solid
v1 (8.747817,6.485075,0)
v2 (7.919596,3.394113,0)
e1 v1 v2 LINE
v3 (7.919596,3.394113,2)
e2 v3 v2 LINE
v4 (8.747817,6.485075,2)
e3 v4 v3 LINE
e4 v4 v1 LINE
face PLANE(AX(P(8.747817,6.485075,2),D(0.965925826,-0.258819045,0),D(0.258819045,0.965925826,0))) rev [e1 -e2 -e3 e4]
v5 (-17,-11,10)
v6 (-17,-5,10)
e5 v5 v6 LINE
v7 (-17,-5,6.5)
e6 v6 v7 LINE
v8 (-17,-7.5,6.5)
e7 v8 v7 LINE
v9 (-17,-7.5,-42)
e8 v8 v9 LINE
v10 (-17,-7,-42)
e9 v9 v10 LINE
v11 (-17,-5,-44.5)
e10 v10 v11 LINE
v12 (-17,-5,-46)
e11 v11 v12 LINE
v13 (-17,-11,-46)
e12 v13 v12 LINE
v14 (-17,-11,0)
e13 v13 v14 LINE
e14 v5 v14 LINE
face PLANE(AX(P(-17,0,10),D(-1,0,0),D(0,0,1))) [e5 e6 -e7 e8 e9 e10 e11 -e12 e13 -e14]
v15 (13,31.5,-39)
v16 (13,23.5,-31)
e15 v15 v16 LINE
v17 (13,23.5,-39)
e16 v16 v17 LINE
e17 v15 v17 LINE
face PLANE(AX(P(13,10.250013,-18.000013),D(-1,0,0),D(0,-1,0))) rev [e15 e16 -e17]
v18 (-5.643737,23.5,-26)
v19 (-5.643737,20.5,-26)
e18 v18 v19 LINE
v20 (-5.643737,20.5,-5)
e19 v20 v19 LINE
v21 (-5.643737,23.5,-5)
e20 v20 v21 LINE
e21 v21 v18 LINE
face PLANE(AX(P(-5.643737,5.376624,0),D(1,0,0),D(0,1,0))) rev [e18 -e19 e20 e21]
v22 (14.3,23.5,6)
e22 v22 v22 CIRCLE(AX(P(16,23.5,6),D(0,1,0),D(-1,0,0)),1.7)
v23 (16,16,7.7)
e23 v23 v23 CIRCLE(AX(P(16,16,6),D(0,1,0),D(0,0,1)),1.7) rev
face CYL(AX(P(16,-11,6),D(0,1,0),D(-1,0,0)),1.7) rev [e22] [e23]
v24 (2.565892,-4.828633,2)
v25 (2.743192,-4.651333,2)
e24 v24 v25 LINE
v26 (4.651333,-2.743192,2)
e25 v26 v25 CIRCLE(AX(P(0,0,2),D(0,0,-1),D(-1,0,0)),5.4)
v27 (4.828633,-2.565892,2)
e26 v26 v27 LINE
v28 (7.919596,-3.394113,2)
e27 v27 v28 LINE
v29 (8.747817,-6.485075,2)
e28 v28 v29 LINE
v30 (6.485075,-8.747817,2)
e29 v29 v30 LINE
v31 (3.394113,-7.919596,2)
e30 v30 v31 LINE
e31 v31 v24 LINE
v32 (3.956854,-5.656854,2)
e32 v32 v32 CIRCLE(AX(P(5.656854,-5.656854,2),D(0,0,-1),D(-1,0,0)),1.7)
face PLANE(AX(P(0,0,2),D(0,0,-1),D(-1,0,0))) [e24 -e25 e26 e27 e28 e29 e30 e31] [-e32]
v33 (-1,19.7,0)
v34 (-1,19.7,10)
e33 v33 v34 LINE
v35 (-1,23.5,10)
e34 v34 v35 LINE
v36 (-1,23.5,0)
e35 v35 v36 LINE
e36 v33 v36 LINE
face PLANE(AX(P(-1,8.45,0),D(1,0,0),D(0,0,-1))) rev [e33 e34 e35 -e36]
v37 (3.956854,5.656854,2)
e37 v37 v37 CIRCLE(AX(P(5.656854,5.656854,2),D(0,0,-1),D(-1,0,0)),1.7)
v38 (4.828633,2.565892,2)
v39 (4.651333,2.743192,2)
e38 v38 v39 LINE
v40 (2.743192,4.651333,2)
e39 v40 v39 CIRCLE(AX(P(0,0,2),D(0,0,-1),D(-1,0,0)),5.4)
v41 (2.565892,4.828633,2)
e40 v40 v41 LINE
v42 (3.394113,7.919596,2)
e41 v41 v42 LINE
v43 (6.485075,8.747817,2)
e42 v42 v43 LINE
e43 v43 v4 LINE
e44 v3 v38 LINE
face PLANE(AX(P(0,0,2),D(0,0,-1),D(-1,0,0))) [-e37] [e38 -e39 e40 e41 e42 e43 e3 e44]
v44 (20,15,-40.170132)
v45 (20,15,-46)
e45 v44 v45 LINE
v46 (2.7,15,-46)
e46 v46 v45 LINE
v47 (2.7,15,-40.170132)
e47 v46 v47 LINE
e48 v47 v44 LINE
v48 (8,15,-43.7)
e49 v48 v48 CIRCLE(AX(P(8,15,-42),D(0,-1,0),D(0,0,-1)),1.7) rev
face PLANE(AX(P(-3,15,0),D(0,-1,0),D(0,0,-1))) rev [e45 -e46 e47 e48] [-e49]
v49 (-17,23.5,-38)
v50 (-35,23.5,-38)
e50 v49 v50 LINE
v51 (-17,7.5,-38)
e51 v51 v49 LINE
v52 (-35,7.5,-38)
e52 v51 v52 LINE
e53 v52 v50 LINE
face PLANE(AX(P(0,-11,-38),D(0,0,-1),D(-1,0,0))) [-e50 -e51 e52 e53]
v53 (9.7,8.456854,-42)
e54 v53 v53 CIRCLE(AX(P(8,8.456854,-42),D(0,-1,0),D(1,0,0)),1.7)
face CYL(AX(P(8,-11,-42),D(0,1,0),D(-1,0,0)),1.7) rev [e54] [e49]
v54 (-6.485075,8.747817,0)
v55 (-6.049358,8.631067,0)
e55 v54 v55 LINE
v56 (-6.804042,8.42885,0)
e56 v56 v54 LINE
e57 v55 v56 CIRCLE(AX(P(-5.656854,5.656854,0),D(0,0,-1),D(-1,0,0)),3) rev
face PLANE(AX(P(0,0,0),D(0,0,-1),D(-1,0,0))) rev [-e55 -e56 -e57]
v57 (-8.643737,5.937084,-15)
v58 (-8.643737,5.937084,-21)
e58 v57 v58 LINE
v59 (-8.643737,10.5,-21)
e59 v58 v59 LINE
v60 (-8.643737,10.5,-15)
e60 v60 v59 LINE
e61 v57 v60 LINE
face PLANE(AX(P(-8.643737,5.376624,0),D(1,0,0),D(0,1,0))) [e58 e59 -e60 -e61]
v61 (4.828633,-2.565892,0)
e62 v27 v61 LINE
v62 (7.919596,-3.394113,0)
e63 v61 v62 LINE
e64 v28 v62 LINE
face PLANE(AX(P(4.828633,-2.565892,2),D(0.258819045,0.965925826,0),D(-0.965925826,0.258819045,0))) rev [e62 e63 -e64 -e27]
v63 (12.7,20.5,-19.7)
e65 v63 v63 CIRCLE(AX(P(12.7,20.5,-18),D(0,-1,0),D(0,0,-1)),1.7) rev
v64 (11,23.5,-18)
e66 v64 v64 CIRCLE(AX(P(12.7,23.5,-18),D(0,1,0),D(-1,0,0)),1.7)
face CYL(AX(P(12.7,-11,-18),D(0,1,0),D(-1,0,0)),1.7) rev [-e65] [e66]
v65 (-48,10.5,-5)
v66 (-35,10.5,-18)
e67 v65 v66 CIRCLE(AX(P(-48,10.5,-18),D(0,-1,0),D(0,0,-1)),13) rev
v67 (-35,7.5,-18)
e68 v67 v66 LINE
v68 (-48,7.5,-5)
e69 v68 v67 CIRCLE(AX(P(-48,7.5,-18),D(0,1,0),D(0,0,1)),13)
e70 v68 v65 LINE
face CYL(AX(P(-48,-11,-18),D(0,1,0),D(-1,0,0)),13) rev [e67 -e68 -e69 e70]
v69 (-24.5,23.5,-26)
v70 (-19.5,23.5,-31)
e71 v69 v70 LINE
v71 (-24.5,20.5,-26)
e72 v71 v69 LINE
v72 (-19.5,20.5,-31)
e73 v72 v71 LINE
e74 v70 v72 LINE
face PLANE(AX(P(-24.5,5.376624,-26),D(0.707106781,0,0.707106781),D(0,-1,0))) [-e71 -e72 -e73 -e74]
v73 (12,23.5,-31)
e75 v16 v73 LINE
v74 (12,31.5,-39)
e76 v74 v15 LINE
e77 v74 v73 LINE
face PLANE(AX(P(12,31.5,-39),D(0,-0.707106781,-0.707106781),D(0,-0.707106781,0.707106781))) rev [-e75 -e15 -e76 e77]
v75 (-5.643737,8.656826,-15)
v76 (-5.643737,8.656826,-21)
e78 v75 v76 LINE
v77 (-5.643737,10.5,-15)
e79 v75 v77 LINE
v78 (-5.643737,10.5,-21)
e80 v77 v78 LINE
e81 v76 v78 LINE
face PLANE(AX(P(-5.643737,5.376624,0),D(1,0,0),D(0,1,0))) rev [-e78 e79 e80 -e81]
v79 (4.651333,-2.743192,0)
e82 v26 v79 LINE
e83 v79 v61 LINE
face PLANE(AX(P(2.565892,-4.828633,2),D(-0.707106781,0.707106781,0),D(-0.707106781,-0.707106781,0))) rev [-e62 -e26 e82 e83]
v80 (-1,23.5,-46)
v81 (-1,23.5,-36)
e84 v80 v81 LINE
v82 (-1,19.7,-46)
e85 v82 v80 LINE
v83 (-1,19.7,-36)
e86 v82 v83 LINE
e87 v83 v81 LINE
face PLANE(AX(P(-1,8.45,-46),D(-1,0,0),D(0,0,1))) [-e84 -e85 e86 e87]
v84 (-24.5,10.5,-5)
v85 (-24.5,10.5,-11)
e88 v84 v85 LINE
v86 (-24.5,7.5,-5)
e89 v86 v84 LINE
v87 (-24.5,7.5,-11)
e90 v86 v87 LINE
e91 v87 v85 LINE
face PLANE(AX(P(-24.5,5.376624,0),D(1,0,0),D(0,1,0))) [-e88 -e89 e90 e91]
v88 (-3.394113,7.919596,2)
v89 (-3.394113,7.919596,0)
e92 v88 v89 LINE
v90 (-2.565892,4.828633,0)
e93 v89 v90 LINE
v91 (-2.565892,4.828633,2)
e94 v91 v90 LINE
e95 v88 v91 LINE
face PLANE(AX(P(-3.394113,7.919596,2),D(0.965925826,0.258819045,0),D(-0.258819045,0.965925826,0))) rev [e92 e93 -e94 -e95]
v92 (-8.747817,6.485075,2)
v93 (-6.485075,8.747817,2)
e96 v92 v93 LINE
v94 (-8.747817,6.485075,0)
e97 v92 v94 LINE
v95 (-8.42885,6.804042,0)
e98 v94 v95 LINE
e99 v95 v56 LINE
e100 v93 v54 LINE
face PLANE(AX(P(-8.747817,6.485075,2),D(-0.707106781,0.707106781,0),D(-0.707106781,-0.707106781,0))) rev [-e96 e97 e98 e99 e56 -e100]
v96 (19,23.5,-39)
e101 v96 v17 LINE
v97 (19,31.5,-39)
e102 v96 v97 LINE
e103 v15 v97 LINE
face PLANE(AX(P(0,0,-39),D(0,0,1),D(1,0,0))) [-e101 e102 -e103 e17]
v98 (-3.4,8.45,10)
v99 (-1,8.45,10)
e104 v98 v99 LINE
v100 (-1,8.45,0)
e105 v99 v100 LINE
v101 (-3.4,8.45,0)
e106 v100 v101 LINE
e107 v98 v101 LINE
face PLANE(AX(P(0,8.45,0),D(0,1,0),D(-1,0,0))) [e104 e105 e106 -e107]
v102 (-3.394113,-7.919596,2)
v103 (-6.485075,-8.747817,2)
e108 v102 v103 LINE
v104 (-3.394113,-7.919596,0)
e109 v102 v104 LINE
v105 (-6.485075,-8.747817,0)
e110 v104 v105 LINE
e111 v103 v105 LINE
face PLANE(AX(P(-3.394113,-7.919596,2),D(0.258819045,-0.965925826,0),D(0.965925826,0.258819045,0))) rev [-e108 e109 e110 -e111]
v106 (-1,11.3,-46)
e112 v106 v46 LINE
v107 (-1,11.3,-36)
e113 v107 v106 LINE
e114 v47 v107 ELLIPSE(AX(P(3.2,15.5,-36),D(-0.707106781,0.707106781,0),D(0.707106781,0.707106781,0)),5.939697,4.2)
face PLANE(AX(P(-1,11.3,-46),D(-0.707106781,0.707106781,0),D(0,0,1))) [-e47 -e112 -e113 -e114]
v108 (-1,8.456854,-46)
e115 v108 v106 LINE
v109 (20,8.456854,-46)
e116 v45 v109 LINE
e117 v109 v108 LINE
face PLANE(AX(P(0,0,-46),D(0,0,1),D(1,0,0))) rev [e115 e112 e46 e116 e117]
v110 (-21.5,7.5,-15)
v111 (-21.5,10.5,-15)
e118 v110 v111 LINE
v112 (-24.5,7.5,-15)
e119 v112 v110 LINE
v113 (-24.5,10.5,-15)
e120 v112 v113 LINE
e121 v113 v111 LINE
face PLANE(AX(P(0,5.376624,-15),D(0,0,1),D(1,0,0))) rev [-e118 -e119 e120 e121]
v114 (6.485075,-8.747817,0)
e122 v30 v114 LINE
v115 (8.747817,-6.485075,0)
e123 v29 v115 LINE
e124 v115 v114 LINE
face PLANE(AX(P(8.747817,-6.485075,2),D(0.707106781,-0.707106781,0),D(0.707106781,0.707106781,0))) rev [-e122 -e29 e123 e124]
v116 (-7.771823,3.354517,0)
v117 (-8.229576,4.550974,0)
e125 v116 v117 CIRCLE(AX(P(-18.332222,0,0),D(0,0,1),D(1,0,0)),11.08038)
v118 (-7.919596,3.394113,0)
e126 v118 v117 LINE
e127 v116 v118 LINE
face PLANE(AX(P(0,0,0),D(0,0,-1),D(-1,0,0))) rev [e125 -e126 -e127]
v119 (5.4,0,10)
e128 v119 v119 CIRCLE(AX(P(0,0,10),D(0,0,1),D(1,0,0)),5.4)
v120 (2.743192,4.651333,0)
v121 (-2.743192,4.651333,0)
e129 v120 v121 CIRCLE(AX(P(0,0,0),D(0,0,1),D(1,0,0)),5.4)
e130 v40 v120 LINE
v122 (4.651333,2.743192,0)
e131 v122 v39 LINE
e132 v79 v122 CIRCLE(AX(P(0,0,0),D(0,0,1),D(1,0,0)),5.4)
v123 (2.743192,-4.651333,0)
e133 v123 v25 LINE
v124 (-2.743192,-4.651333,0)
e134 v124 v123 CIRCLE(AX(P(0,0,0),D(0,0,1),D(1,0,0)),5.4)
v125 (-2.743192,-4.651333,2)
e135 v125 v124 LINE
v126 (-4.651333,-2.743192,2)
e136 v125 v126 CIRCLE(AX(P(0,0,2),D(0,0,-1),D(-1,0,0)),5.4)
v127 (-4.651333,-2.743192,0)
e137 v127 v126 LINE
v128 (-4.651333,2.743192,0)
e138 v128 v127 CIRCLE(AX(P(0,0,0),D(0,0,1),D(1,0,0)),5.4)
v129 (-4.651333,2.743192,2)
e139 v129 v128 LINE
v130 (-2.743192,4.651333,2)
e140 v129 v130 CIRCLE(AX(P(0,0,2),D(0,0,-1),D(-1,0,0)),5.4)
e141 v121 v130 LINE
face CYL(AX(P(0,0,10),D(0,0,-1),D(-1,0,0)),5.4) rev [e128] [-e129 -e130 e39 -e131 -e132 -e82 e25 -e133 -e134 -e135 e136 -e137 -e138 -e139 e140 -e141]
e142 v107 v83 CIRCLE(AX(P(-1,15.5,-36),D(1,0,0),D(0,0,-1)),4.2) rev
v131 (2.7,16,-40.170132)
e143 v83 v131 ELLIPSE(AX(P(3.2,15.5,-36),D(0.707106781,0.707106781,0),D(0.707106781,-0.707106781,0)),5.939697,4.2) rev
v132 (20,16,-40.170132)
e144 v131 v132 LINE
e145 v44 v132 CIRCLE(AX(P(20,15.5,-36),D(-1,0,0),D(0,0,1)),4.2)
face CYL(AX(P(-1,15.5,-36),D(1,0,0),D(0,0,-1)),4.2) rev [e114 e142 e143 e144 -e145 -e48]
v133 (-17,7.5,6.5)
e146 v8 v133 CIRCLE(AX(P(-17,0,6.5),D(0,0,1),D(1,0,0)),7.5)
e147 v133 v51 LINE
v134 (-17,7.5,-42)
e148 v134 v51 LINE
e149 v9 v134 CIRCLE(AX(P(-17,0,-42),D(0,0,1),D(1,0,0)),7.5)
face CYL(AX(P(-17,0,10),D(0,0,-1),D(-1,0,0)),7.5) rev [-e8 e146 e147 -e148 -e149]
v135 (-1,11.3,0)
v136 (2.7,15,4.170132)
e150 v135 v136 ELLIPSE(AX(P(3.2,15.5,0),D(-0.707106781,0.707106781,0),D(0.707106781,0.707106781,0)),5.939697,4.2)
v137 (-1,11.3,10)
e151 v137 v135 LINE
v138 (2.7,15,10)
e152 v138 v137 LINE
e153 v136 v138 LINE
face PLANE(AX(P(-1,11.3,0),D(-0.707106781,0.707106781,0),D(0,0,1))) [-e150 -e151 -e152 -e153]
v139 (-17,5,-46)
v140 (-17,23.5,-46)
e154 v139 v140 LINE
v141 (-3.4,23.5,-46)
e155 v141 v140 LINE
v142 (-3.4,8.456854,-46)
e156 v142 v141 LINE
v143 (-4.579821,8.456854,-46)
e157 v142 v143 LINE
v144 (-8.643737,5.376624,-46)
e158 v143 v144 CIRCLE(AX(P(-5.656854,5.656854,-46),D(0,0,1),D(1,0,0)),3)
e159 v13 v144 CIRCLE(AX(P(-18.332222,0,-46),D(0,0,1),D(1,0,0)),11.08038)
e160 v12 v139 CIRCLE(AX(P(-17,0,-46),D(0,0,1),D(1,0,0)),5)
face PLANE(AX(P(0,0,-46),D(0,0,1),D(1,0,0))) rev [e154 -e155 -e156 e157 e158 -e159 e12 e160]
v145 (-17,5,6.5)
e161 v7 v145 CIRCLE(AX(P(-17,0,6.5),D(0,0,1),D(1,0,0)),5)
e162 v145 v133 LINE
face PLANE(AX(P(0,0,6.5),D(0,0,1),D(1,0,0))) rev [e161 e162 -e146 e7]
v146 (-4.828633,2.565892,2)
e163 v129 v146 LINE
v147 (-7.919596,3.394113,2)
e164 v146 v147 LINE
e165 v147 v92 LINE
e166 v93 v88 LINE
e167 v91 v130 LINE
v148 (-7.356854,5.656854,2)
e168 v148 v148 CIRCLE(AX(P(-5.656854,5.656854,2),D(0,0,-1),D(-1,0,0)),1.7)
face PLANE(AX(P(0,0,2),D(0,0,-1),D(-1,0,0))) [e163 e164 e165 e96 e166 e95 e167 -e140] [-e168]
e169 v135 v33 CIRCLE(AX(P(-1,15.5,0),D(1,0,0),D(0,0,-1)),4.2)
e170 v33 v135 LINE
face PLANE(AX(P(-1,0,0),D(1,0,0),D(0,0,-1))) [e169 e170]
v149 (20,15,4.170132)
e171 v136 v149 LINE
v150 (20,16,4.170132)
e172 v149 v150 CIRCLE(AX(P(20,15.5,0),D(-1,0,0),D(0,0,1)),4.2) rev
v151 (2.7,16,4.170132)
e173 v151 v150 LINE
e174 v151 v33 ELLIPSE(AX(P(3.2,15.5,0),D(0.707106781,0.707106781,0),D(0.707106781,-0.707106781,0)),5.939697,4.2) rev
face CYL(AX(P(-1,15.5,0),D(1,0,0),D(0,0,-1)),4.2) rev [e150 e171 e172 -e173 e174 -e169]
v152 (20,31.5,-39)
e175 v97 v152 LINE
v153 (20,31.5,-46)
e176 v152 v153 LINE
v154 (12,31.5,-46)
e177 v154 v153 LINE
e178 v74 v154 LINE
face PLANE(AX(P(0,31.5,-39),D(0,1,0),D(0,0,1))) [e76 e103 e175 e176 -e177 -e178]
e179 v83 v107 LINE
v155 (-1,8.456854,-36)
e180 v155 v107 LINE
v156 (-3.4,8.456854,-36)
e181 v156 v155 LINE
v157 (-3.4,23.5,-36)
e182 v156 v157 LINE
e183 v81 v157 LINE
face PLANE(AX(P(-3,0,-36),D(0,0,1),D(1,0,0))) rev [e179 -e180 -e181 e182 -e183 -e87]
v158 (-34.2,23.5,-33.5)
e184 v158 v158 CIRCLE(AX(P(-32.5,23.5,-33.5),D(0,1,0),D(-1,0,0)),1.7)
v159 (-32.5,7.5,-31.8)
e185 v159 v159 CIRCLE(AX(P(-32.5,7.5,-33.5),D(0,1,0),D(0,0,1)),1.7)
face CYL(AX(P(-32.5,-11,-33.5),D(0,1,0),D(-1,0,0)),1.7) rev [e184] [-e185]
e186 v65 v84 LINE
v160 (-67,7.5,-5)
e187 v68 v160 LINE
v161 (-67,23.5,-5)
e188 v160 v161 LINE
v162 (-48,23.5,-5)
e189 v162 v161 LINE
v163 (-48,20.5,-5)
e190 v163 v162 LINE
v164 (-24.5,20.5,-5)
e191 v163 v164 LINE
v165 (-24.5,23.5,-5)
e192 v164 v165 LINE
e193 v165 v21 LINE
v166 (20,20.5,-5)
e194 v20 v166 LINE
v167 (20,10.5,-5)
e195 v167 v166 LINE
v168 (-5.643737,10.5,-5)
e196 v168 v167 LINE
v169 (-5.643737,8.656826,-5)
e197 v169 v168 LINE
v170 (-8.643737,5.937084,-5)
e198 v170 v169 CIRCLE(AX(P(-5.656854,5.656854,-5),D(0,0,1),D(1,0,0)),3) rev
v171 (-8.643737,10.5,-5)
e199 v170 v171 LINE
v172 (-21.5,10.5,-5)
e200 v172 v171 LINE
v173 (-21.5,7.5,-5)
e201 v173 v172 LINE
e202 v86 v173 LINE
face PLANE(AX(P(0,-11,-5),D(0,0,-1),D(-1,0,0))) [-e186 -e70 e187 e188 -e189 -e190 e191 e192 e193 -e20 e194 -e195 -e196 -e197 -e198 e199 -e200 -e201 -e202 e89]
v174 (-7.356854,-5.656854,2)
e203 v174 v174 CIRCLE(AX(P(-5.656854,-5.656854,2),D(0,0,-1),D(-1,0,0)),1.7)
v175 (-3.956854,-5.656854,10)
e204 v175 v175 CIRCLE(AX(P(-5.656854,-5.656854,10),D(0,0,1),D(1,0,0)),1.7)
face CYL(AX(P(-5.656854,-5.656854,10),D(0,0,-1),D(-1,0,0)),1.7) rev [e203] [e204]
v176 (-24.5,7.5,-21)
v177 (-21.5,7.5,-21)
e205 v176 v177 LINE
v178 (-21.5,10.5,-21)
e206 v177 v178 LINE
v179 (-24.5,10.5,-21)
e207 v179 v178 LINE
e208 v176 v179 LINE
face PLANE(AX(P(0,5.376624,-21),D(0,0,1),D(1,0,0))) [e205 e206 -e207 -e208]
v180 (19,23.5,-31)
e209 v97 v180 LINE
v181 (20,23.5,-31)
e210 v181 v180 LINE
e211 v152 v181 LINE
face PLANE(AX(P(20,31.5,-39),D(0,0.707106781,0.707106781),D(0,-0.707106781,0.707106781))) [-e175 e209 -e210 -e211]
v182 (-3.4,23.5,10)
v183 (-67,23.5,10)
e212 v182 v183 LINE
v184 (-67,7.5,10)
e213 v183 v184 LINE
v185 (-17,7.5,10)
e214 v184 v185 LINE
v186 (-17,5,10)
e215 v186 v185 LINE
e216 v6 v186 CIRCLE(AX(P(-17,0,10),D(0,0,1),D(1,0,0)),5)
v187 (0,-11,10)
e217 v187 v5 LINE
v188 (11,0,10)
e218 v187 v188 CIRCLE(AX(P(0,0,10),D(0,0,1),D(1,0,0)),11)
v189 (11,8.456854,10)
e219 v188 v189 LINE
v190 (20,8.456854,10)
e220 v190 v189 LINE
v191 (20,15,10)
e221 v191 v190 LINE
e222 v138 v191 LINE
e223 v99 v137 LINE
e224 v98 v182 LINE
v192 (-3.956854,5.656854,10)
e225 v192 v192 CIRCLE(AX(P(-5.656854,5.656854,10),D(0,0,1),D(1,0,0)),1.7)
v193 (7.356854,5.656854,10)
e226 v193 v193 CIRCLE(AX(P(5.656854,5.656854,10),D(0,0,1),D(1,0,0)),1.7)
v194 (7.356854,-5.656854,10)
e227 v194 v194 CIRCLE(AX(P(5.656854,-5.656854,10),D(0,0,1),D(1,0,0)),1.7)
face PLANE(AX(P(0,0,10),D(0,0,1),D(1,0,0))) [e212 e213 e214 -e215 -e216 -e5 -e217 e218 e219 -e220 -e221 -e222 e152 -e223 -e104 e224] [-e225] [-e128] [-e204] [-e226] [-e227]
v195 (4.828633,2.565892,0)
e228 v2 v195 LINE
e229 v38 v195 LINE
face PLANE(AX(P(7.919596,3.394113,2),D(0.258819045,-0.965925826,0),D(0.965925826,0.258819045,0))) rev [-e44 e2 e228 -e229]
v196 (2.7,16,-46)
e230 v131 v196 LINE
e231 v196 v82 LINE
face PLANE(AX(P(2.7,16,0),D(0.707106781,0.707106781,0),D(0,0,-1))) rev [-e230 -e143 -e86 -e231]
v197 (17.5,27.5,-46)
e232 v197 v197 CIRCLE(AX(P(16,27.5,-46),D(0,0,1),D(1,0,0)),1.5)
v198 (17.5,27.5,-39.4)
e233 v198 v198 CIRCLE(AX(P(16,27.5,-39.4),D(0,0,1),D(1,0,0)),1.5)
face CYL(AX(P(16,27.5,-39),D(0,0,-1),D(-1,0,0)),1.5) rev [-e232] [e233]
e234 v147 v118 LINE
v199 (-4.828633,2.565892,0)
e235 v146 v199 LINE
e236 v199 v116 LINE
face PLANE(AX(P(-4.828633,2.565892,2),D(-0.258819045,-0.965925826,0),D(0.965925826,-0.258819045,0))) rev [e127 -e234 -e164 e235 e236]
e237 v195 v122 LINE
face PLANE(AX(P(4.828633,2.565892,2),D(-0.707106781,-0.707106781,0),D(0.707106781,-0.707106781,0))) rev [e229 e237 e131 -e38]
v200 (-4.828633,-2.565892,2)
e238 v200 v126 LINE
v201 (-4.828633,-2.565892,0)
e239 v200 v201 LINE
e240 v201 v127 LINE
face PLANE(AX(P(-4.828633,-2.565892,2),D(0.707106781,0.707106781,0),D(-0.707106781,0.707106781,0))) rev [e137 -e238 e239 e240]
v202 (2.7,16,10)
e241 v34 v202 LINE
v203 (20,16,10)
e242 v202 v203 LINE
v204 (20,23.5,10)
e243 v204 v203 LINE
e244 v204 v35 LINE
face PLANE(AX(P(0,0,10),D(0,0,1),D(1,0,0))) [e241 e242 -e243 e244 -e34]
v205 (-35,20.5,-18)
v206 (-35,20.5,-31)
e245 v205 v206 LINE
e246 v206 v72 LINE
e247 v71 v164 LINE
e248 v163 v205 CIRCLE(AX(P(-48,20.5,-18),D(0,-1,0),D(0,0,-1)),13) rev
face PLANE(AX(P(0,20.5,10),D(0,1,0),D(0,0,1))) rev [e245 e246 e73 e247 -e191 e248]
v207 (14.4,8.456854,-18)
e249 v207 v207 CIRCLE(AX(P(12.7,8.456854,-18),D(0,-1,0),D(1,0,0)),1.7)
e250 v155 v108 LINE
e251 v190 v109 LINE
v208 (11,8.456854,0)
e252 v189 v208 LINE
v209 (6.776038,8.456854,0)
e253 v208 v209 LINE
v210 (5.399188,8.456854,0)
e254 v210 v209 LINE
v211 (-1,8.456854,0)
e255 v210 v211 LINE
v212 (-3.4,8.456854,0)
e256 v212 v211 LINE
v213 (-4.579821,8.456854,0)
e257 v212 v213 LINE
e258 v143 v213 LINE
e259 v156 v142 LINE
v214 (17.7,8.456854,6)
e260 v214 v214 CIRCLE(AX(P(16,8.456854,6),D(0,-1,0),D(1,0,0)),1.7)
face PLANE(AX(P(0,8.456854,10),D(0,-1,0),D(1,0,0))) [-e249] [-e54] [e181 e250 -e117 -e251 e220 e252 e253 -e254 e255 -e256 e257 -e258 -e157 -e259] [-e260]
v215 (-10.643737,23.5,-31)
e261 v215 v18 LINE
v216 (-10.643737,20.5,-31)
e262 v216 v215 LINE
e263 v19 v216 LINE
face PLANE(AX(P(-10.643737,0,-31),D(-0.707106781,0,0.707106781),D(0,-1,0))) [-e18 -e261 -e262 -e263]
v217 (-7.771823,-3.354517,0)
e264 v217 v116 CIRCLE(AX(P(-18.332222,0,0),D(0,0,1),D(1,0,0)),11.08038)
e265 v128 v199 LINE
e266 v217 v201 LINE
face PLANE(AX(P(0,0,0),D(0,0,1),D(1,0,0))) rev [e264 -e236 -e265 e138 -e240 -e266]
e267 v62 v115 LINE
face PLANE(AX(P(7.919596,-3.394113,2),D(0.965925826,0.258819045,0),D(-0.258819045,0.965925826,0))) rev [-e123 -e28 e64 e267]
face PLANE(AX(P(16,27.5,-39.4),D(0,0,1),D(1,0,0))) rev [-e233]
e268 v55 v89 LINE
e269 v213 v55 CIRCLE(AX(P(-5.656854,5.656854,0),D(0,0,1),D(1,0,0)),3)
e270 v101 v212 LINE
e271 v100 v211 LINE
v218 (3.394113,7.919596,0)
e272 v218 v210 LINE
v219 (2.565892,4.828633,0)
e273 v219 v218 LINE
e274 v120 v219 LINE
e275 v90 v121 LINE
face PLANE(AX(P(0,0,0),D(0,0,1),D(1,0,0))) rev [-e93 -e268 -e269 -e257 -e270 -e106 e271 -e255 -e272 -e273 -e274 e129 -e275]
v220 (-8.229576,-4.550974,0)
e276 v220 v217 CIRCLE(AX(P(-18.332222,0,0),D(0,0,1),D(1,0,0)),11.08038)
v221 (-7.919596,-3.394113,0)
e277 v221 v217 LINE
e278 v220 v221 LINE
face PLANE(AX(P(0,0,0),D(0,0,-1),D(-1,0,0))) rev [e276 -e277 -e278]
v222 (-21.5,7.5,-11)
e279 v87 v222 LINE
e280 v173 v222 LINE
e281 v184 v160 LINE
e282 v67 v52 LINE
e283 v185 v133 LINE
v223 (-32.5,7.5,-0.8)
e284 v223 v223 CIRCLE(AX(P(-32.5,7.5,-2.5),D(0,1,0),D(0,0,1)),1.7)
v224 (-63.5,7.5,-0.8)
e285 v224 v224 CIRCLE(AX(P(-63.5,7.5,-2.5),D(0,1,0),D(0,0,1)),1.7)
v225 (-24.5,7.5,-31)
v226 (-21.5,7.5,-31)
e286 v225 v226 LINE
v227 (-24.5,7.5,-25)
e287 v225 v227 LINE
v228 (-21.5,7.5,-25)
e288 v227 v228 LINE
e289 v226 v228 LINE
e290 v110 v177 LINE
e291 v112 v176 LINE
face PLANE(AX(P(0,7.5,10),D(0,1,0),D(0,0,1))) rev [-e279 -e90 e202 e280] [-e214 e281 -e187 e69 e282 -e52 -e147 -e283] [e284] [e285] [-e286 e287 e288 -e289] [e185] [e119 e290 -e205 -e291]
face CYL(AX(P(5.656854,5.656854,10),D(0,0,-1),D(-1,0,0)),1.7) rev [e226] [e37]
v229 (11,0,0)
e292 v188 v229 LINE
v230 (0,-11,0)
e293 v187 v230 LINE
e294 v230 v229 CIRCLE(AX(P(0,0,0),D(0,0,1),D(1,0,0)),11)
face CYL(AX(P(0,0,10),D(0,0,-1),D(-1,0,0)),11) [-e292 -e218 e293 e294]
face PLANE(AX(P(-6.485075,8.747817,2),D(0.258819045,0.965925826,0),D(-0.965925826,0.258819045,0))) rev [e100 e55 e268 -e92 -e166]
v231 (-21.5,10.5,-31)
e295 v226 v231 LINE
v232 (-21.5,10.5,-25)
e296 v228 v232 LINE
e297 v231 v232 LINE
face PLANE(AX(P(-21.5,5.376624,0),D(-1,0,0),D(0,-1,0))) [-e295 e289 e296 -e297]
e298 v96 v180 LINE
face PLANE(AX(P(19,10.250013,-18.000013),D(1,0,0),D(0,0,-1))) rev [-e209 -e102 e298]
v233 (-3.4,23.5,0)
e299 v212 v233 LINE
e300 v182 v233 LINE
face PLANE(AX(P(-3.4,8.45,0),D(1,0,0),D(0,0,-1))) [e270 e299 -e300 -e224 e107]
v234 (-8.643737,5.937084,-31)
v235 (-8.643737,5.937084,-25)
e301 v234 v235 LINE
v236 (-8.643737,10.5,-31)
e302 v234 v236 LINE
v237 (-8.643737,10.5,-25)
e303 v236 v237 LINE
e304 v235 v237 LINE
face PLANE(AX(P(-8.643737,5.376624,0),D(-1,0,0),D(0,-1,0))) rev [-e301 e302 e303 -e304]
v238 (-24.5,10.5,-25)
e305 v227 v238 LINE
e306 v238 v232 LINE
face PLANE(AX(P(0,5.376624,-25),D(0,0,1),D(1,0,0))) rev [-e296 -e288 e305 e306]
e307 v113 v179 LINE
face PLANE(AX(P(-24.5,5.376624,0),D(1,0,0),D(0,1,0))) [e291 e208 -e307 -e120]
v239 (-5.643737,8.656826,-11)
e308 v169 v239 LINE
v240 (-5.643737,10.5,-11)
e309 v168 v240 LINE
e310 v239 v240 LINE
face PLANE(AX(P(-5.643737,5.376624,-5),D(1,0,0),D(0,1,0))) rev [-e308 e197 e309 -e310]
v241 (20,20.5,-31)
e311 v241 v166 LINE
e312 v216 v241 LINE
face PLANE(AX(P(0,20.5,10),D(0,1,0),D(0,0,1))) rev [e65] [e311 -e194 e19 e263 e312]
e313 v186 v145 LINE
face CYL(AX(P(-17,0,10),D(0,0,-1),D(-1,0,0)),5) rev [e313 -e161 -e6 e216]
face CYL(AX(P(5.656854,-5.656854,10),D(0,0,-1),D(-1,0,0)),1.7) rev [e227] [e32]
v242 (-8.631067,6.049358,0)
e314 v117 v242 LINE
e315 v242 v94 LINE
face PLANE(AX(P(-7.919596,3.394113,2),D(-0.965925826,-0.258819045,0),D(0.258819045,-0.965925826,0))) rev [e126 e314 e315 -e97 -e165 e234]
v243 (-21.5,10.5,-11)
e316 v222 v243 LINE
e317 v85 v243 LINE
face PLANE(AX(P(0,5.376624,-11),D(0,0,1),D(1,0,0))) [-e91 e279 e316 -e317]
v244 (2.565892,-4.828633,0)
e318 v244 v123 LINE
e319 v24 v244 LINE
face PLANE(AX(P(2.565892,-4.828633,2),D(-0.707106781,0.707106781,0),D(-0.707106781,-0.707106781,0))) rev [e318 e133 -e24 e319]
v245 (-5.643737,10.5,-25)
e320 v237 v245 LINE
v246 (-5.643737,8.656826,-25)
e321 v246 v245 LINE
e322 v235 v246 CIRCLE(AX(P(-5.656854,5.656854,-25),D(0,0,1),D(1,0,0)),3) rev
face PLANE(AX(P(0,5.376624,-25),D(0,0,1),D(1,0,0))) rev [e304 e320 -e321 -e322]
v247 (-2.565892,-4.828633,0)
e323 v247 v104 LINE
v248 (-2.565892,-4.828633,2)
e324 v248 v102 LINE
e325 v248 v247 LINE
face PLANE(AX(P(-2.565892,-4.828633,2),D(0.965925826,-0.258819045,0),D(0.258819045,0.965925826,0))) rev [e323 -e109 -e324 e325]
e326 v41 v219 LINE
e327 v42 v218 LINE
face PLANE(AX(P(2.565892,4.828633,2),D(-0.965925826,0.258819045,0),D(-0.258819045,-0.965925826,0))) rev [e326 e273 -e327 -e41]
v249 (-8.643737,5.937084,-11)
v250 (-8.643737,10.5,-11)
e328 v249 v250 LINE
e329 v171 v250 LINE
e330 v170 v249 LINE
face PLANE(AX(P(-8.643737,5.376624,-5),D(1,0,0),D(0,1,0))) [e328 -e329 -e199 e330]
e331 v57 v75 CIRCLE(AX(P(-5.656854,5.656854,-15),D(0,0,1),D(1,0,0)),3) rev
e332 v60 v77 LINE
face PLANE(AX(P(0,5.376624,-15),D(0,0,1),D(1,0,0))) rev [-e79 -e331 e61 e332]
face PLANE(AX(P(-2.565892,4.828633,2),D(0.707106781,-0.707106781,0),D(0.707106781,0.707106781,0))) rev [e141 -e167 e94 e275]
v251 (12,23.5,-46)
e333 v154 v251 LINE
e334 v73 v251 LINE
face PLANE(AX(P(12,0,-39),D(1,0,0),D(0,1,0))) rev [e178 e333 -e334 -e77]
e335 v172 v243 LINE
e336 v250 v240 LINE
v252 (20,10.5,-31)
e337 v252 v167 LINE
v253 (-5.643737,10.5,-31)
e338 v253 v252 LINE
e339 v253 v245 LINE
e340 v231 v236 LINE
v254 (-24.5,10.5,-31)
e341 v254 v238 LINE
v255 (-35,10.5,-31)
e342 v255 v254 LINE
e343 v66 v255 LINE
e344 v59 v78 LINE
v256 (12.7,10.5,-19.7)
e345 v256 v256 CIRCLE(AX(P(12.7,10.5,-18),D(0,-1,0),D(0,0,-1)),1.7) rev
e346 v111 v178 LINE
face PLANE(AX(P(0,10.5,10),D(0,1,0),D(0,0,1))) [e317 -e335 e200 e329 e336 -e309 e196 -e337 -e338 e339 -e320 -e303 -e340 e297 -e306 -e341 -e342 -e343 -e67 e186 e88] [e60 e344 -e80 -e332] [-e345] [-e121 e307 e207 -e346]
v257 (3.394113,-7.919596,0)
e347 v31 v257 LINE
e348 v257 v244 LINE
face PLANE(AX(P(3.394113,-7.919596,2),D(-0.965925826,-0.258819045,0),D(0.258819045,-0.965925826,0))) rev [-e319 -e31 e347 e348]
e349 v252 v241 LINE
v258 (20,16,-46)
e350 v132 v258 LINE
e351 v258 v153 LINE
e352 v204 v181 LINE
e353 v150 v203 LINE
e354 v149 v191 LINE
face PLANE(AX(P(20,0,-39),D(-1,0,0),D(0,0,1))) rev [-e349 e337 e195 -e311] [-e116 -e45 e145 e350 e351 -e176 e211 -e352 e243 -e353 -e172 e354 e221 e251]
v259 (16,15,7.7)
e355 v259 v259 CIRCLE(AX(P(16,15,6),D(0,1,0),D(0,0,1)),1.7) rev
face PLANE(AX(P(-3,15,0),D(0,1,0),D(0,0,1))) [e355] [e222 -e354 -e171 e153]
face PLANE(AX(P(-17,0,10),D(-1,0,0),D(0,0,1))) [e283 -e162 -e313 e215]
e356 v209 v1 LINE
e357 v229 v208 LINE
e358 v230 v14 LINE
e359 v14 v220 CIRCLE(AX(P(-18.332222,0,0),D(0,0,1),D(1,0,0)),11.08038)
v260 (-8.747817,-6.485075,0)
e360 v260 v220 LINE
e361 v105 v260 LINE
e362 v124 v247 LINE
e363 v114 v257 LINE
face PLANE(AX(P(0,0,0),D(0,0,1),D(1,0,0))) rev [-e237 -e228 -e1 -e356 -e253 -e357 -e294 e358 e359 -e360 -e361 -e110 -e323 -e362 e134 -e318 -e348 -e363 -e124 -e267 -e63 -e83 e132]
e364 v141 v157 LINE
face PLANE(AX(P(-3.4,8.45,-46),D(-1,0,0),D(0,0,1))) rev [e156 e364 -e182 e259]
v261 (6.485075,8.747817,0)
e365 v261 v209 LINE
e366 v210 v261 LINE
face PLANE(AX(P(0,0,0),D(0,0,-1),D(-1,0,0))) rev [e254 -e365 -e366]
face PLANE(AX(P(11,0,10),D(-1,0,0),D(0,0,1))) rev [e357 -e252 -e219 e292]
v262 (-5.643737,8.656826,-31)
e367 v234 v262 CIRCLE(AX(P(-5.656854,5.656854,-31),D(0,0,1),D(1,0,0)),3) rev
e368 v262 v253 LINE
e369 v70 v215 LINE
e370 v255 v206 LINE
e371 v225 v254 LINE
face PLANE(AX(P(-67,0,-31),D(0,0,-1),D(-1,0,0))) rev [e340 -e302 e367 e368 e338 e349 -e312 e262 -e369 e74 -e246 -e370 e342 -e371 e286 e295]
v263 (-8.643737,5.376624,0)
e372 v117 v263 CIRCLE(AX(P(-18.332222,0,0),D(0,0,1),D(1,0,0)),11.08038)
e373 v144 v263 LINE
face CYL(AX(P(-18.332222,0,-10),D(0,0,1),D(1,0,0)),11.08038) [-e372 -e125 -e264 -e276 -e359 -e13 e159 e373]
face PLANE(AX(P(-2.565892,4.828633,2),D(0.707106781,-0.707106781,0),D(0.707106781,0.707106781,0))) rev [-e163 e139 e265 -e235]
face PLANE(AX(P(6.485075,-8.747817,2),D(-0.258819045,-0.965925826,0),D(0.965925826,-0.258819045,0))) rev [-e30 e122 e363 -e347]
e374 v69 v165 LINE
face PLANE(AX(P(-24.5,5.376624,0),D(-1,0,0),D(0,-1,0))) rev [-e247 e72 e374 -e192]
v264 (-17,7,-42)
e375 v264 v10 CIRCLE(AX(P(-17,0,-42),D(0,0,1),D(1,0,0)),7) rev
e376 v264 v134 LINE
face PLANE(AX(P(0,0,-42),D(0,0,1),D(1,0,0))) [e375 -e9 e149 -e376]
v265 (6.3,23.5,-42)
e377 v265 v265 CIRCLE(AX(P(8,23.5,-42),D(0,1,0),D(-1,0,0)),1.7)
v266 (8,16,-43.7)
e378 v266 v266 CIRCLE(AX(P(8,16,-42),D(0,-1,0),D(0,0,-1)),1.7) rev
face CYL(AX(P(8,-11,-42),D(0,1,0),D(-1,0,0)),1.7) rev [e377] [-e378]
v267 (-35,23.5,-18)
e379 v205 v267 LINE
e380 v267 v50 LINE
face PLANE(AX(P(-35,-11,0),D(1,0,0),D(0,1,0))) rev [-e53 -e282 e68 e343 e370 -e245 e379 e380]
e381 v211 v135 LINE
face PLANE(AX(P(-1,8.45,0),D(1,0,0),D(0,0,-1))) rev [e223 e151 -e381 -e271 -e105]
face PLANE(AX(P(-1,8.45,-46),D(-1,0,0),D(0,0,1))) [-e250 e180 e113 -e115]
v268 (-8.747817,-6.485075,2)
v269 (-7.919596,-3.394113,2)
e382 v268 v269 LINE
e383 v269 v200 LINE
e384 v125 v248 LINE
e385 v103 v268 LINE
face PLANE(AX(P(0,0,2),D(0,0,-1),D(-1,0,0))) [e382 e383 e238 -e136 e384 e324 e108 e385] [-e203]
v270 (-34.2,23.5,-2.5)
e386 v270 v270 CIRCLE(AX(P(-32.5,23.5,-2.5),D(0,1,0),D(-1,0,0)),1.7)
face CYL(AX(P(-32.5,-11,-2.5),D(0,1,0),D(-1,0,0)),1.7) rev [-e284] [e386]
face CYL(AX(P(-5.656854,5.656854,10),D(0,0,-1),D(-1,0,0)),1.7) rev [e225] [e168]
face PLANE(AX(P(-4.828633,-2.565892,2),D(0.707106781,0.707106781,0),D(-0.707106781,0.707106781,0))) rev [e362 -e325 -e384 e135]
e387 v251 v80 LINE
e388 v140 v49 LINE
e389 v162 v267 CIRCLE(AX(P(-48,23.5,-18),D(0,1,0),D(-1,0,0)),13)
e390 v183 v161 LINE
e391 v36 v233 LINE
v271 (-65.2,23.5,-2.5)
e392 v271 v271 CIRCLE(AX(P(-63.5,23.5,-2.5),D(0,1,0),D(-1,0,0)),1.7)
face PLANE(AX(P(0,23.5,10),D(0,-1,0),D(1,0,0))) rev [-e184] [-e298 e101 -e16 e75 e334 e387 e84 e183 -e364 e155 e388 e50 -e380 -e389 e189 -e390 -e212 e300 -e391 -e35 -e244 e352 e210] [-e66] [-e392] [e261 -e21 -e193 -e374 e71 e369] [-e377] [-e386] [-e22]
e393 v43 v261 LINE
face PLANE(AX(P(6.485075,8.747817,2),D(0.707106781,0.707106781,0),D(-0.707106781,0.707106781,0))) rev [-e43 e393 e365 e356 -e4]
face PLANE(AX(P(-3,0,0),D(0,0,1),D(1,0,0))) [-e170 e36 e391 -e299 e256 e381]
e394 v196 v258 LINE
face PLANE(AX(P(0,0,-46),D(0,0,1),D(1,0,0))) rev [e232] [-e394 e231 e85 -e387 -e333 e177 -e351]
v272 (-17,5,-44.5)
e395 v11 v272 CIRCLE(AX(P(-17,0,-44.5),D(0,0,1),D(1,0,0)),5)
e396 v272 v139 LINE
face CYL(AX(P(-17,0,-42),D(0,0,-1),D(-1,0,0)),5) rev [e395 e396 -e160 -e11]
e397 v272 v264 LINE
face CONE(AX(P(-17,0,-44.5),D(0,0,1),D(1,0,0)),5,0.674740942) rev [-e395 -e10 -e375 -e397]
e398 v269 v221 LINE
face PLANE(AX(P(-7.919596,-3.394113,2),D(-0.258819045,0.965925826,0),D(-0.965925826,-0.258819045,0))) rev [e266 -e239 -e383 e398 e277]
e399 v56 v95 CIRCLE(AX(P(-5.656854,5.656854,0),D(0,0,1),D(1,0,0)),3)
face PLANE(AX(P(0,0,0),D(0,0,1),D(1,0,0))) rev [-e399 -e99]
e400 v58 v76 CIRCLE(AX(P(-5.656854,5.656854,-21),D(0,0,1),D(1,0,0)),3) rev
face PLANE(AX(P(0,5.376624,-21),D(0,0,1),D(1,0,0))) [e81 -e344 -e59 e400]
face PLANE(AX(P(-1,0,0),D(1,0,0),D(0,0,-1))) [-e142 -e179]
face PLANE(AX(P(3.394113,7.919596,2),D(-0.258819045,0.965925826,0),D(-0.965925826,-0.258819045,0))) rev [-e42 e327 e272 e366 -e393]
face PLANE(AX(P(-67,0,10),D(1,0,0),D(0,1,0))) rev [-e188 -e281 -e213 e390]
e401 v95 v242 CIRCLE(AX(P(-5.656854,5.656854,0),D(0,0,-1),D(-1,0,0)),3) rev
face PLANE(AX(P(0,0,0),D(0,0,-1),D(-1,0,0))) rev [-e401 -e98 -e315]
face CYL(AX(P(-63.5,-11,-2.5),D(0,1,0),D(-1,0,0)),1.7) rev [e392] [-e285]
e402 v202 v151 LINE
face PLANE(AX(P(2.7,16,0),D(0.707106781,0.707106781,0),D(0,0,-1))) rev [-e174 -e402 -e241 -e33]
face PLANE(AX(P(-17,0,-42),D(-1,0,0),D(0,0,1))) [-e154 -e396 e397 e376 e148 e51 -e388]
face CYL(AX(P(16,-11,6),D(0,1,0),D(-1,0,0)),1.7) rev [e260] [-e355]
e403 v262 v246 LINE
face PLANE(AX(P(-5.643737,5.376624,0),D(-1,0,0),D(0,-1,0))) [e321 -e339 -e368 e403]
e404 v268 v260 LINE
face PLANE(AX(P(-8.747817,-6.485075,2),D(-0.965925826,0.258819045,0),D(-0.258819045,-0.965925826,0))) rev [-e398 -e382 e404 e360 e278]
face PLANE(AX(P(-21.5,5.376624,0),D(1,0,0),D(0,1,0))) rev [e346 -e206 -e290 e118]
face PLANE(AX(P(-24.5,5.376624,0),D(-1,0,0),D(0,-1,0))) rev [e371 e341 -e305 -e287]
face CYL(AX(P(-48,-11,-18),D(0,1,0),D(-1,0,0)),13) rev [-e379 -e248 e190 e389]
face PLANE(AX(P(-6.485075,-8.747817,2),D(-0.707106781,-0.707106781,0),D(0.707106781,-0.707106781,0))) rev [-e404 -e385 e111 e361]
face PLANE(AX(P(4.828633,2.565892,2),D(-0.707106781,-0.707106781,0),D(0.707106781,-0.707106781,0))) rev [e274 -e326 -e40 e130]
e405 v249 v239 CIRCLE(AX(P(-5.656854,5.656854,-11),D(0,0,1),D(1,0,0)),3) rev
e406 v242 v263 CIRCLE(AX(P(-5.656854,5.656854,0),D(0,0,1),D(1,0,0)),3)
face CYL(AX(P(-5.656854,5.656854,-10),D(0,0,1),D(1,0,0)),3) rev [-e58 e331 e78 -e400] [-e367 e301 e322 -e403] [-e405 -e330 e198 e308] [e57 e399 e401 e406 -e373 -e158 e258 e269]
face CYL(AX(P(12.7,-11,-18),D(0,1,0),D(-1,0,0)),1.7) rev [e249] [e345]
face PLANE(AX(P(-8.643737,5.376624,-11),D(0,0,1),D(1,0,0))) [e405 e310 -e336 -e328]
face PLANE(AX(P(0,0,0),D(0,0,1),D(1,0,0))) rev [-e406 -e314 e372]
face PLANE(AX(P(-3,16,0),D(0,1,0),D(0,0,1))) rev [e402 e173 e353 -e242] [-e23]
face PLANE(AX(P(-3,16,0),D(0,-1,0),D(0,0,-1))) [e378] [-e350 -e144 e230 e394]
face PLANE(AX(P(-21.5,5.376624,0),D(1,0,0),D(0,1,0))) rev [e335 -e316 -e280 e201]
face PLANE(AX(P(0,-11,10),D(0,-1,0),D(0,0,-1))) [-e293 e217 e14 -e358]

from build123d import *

# Parameters (mm, degrees)
SKETCH_1_R           = 1.7
SKETCH_1_R_2         = 5.4
EXTRUDE_1_DEPTH      = 10
EXTRUDE_START        = -10
EXTRUDE_2_DEPTH      = 10
CUT_EXTRUDE_1_DEPTH  = 2
EXTRUDE_START_2      = -46
EXTRUDE_3_DEPTH      = 36
EXTRUDE_START_3      = 6.5
EXTRUDE_4_DEPTH      = 3.5
EXTRUDE_5_DEPTH      = 4
SKETCH_1_10_W        = 8
SKETCH_1_10_H        = 8
SKETCH_1_10_R        = 1.5
EXTRUDE_6_DEPTH      = 7
RIB_2_REACH          = 105.331
SKETCH_4_WALL_W      = 219.975267576
SKETCH_4_WALL_H      = 1
RIB_START            = -1
RIB_3_DEPTH          = 1
EXTRUDE_START_4      = -0.4
SKETCH_6_R           = 1.5
EXTRUDE_7_DEPTH      = 0.4
SKETCH_7_R           = 1.7
SKETCH_7_R_2         = 1.35
CUT_EXTRUDE_2_DEPTH  = 89.290712988
SKETCH_8_W           = 26
SKETCH_8_H           = 10
CUT_EXTRUDE_3_DEPTH  = 105.174133066
CUT_EXTRUDE_4_DEPTH  = 22
CUT_EXTRUDE_5_DEPTH  = 24
SKETCH_7_4_W         = 2.4
SKETCH_7_4_H         = 10
CUT_EXTRUDE_9_DEPTH  = 15.05
CHAMFER_1_SIZE       = 3.7
CUT_EXTRUDE_START    = -17.562916
SKETCH_7_5_W         = 3
SKETCH_7_5_H         = 6
CUT_EXTRUDE_10_DEPTH = 17.562916
CUT_EXTRUDE_11_REACH = 90.291
CHAMFER_2_SIZE       = 5
CHAMFER_3_SIZE       = 2
CHAMFER_3_SIZE2      = 2.5
SKETCH_9_W           = 11.322924712
SKETCH_9_H           = 24.282583949
CUT_EXTRUDE_12_DEPTH = 93.82914413


# Read off the part's stored shape, not the designer's step: 筋3
with BuildPart() as part:
    # 草图1 → 凸台-拉伸1 (new body)
    with BuildSketch(Plane.XY):
        with BuildLine():
            Line((-17, -7.5), (-17, -11))
            Line((-17, -11), (0, -11))
            ThreePointArc((0, -11), (7.778174593, -7.778174593), (11, 0))
            Line((11, 0), (11, 8.456854249))
            Line((11, 8.456854249), (28, 8.456854249))
            Line((28, 8.456854249), (28, 10.5))
            Line((28, 10.5), (21, 10.5))
            Line((21, 10.5), (21, 20.5))
            Line((21, 20.5), (28, 20.5))
            Line((28, 20.5), (28, 23.5))
            Line((28, 23.5), (-67, 23.5))
            Line((-67, 23.5), (-67, 7.5))
            Line((-67, 7.5), (-17, 7.5))
            ThreePointArc((-17, 7.5), (-9.5, 0), (-17, -7.5))
        make_face()
        with Locations((-5.656854249, -5.656854249)):
            Circle(SKETCH_1_R, mode=Mode.SUBTRACT)
        with Locations((5.656854249, -5.656854249)):
            Circle(SKETCH_1_R, mode=Mode.SUBTRACT)
        Circle(SKETCH_1_R_2, mode=Mode.SUBTRACT)
        with Locations((-5.656854249, 5.656854249)):
            Circle(SKETCH_1_R, mode=Mode.SUBTRACT)
        with Locations((5.656854249, 5.656854249)):
            Circle(SKETCH_1_R, mode=Mode.SUBTRACT)
    extrude(amount=EXTRUDE_1_DEPTH)

    # 草图1<6> → 凸台-拉伸2 (add)
    with BuildSketch(Plane.XY.offset(EXTRUDE_START)):
        with BuildLine():
            Line((21, 10.5), (21, 20.5))
            Line((21, 20.5), (28, 20.5))
            Line((28, 20.5), (28, 23.5))
            Line((28, 23.5), (-67, 23.5))
            Line((-67, 23.5), (-67, 7.5))
            Line((-67, 7.5), (-17, 7.5))
            ThreePointArc((-17, 7.5), (-9.5, 0), (-17, -7.5))
            Line((-17, -7.5), (-17, -11))
            ThreePointArc((-17, -11), (-8.462447466, -5.036106671), (-8.643737412, 5.376624039))
            ThreePointArc((-8.643737412, 5.376624039), (-7.46899014, 8.047704206), (-4.579821288, 8.456854249))
            Line((-4.579821288, 8.456854249), (28, 8.456854249))
            Line((28, 8.456854249), (28, 10.5))
            Line((28, 10.5), (21, 10.5))
        make_face()
    extrude(amount=EXTRUDE_2_DEPTH)

    # 草图3 → 切除-拉伸1 (cut)
    with BuildSketch(Plane(origin=(0, 0, 0), x_dir=(-1, 0, 0), z_dir=(0, 0, -1))):
        Polygon((7.919595949, 3.39411255), (8.747816894, 6.485075194), (6.485075194, 8.747816894), (3.39411255, 7.919595949), (2.565891605, 4.828633305), (4.828633305, 2.565891605), align=None)
        Polygon((-2.565891605, 4.828633305), (-3.39411255, 7.919595949), (-6.485075194, 8.747816894), (-8.747816894, 6.485075194), (-7.919595949, 3.39411255), (-4.828633305, 2.565891605), align=None)
        Polygon((-3.39411255, -7.919595949), (-2.565891605, -4.828633305), (-4.828633305, -2.565891605), (-7.919595949, -3.39411255), (-8.747816894, -6.485075194), (-6.485075194, -8.747816894), align=None)
        Polygon((2.565891605, -4.828633305), (3.39411255, -7.919595949), (6.485075194, -8.747816894), (8.747816894, -6.485075194), (7.919595949, -3.39411255), (4.828633305, -2.565891605), align=None)
    extrude(amount=-CUT_EXTRUDE_1_DEPTH, mode=Mode.SUBTRACT)

    # 草图1<7> → 凸台-拉伸3 (add)
    with BuildSketch(Plane.XY.offset(EXTRUDE_START_2)):
        with BuildLine():
            Line((21, 8.456854249), (21, 23.5))
            Line((21, 23.5), (-67, 23.5))
            Line((-67, 23.5), (-67, 7.5))
            Line((-67, 7.5), (-17, 7.5))
            ThreePointArc((-17, 7.5), (-9.5, 0), (-17, -7.5))
            Line((-17, -7.5), (-17, -11))
            ThreePointArc((-17, -11), (-8.462447466, -5.036106671), (-8.643737412, 5.376624039))
            ThreePointArc((-8.643737412, 5.376624039), (-7.46899014, 8.047704206), (-4.579821288, 8.456854249))
            Line((-4.579821288, 8.456854249), (21, 8.456854249))
        make_face()
    extrude(amount=EXTRUDE_3_DEPTH)

    # 草图1<8> → 凸台-拉伸4 (add)
    with BuildSketch(Plane.XY.offset(EXTRUDE_START_3)):
        with BuildLine():
            Line((-17, -5), (-17, -7.5))
            ThreePointArc((-17, -7.5), (-9.5, 0), (-17, 7.5))
            Line((-17, 7.5), (-17, 5))
            ThreePointArc((-17, 5), (-12, 0), (-17, -5))
        make_face()
    extrude(amount=EXTRUDE_4_DEPTH)

    # 草图1<9> → 凸台-拉伸5 (add)
    with BuildSketch(Plane.XY.offset(EXTRUDE_START_2)):
        with BuildLine():
            Line((-17, -5), (-17, -7.5))
            ThreePointArc((-17, -7.5), (-9.5, 0), (-17, 7.5))
            Line((-17, 7.5), (-17, 5))
            ThreePointArc((-17, 5), (-12, 0), (-17, -5))
        make_face()
    extrude(amount=EXTRUDE_5_DEPTH)

    # 草图1<10> → 凸台-拉伸6 (add)
    with BuildSketch(Plane.XY.offset(EXTRUDE_START_2)):
        with Locations((16, 27.5)):
            Rectangle(SKETCH_1_10_W, SKETCH_1_10_H)
        with Locations((16, 27.5)):
            Circle(SKETCH_1_10_R, mode=Mode.SUBTRACT)
    extrude(amount=EXTRUDE_6_DEPTH)

    # 草图4 wall → 筋2 (add, up to next)
    with BuildSketch(Plane(origin=(20, 27.5, -35), x_dir=(0, -0.707106781187, 0.707106781187), z_dir=(0, -0.707106781187, -0.707106781187)), mode=Mode.PRIVATE) as rib_2_sk1:
        with Locations((0, 0.5)):
            Rectangle(SKETCH_4_WALL_W, SKETCH_4_WALL_H)
    rib_2_tool1 = extrude(rib_2_sk1.sketch, amount=RIB_2_REACH, mode=Mode.PRIVATE) - part.part
    add(rib_2_tool1.solids().sort_by_distance((20, 27.5, -35))[0])

    # 筋3 outline → 筋3 (add)
    with BuildSketch(Plane.ZY.offset(-12).offset(RIB_START)):
        Polygon((-31, 23.5), (-39, 31.5), (-39, 23.5), align=None)
    extrude(amount=RIB_3_DEPTH)

    # 草图6 → 凸台-拉伸7 (add)
    with BuildSketch(Plane.XY.offset(-39).offset(EXTRUDE_START_4)):
        with Locations((16, 27.5)):
            Circle(SKETCH_6_R)
    extrude(amount=EXTRUDE_7_DEPTH)

    # 草图7 → 切除-拉伸2 (cut, through all)
    with BuildSketch(Plane(origin=(0, 23.5, 0), x_dir=(1, 0, 0), z_dir=(0, 1, 0))):
        with BuildLine():
            Line((-17, 38), (-17, 46))
            Line((-17, 46), (-69, 46))
            Line((-69, 46), (-69, 5))
            Line((-69, 5), (-48, 5))
            ThreePointArc((-48, 5), (-38.807611845, 8.807611845), (-35, 18))
            Line((-35, 18), (-35, 38))
            Line((-35, 38), (-17, 38))
        make_face()
        with Locations(Location((12.7, 18, 0), (0, 0, 180))):
            Circle(SKETCH_7_R)
        with Locations(Location((16, -6, 0), (0, 0, 180))):
            Circle(SKETCH_7_R)
        with Locations(Location((8, 42, 0), (0, 0, 180))):
            Circle(SKETCH_7_R)
        with Locations(Location((-32.5, 2.5, 0), (0, 0, 180))):
            Circle(SKETCH_7_R)
        with Locations(Location((-63.5, 2.5, 0), (0, 0, 180))):
            Circle(SKETCH_7_R)
        with Locations(Location((-32.5, 33.5, 0), (0, 0, 180))):
            Circle(SKETCH_7_R)
        with Locations(Location((24.5, -5, 0), (0, 0, 180))):
            Circle(SKETCH_7_R_2)
        with Locations(Location((24.5, 5, 0), (0, 0, 270))):
            Circle(SKETCH_7_R_2)
    extrude(amount=-CUT_EXTRUDE_2_DEPTH, mode=Mode.SUBTRACT)

    # 草图8 → 切除-拉伸3 (cut, through all)
    with BuildSketch(Plane(origin=(21, 0, 0), x_dir=(0, 0, -1), z_dir=(1, 0, 0))):
        with Locations((18, 15.5)):
            Rectangle(SKETCH_8_W, SKETCH_8_H)
    extrude(amount=-CUT_EXTRUDE_3_DEPTH, mode=Mode.SUBTRACT)

    # 草图8<3> → 切除-拉伸4 (cut)
    with BuildSketch(Plane(origin=(21, 0, 0), x_dir=(0, 0, -1), z_dir=(1, 0, 0))):
        with BuildLine():
            ThreePointArc((36, 19.7), (31.8, 15.5), (36, 11.3))
            Line((36, 11.3), (36, 19.7))
        make_face()
        with BuildLine():
            ThreePointArc((4.2, 15.5), (2.969848481, 18.469848481), (0, 19.7))
            Line((0, 19.7), (0, 11.3))
            ThreePointArc((0, 11.3), (2.969848481, 12.530151519), (4.2, 15.5))
        make_face()
    extrude(amount=-CUT_EXTRUDE_4_DEPTH, mode=Mode.SUBTRACT)

    # 草图8<4> → 切除-拉伸5 (cut)
    with BuildSketch(Plane(origin=(21, 0, 0), x_dir=(0, 0, -1), z_dir=(1, 0, 0))):
        with BuildLine():
            Line((0, 11.3), (0, 19.7))
            ThreePointArc((0, 19.7), (-2.787471973, 18.641655614), (-4.170131892, 16))
            Line((-4.170131892, 16), (-10, 16))
            Line((-10, 16), (-10, 15))
            Line((-10, 15), (-4.170131892, 15))
            ThreePointArc((-4.170131892, 15), (-2.787471973, 12.358344386), (0, 11.3))
        make_face()
        with BuildLine():
            Line((40.170131892, 15), (46, 15))
            Line((46, 15), (46, 16))
            Line((46, 16), (40.170131892, 16))
            ThreePointArc((40.170131892, 16), (38.787471973, 18.641655614), (36, 19.7))
            Line((36, 19.7), (36, 11.3))
            ThreePointArc((36, 11.3), (38.787471973, 12.358344386), (40.170131892, 15))
        make_face()
    extrude(amount=-CUT_EXTRUDE_5_DEPTH, mode=Mode.SUBTRACT)

    # 草图7<4> → 切除-拉伸9 (cut)
    with BuildSketch(Plane(origin=(0, 23.5, 0), x_dir=(1, 0, 0), z_dir=(0, 1, 0))):
        with Locations((-2.2, -5)):
            Rectangle(SKETCH_7_4_W, SKETCH_7_4_H)
        with Locations((-2.2, 41)):
            Rectangle(SKETCH_7_4_W, SKETCH_7_4_H)
    extrude(amount=-CUT_EXTRUDE_9_DEPTH, mode=Mode.SUBTRACT)

    # 倒角1
    chamfer_1_edges = [part.edges().sort_by_distance(p)[0] for p in [
        (-1, 16, -43.085065946),
        (-1, 15, -43.085065946),
        (-1, 16, 7.085065946),
        (-1, 15, 7.085065946),
    ]]
    chamfer(chamfer_1_edges, length=CHAMFER_1_SIZE)

    # 草图7<5> → 切除-拉伸10 (cut)
    with BuildSketch(Plane(origin=(0, 23.5, 0), x_dir=(1, 0, 0), z_dir=(0, 1, 0)).offset(CUT_EXTRUDE_START)):
        with Locations((-7.143737412, 18)):
            Rectangle(SKETCH_7_5_W, SKETCH_7_5_H)
        with Locations((-7.143737412, 28)):
            Rectangle(SKETCH_7_5_W, SKETCH_7_5_H)
        with Locations((-23, 28)):
            Rectangle(SKETCH_7_5_W, SKETCH_7_5_H)
        with Locations((-23, 18)):
            Rectangle(SKETCH_7_5_W, SKETCH_7_5_H)
        with Locations((-23, 8)):
            Rectangle(SKETCH_7_5_W, SKETCH_7_5_H)
        with Locations((-7.143737412, 8)):
            Rectangle(SKETCH_7_5_W, SKETCH_7_5_H)
    extrude(amount=CUT_EXTRUDE_10_DEPTH, mode=Mode.SUBTRACT)

    # 草图7<6> → 切除-拉伸11 (cut, up to next)
    with BuildSketch(Plane(origin=(0, 23.5, 0), x_dir=(1, 0, 0), z_dir=(0, 1, 0)), mode=Mode.PRIVATE) as cut_extrude_11_sk1:
        Polygon((-21.5, 5), (-8.643737412, 5), (-8.643737412, 11), (-5.643737412, 11), (-5.643737412, 15), (-8.643737412, 15), (-8.643737412, 21), (-5.643737412, 21), (-5.643737412, 25), (-8.643737412, 25), (-8.643737412, 31), (-21.5, 31), (-21.5, 25), (-24.5, 25), (-24.5, 21), (-21.5, 21), (-21.5, 15), (-24.5, 15), (-24.5, 11), (-21.5, 11), align=None)
    cut_extrude_11_tool1 = extrude(cut_extrude_11_sk1.sketch, amount=-CUT_EXTRUDE_11_REACH, mode=Mode.PRIVATE) & part.part
    add(cut_extrude_11_tool1.solids().sort_by_distance((-15.071869, 23.5, -18))[0], mode=Mode.SUBTRACT)

    # 倒角2
    chamfer_2_edges = [part.edges().sort_by_distance(p)[0] for p in [
        (-5.643737412, 22, -31),
        (-24.5, 22, -31),
    ]]
    chamfer(chamfer_2_edges, length=CHAMFER_2_SIZE)

    # 倒角3
    chamfer_3_edges = [part.edges().sort_by_distance(p)[0] for p in [
        (-12, 0, -42),
    ]]
    chamfer_3_side = [part.faces().sort_by_distance(p)[0] for p in [
        (-9.667705098, 0, -42),
    ]]
    chamfer(chamfer_3_edges, length=CHAMFER_3_SIZE, length2=CHAMFER_3_SIZE2, reference=chamfer_3_side[0])

    # 草图9 → 切除-拉伸12 (cut, through all)
    with BuildSketch(Plane.XY.offset(10)):
        with Locations((25.661462356, 19.358708026)):
            Rectangle(SKETCH_9_W, SKETCH_9_H)
    extrude(amount=-CUT_EXTRUDE_12_DEPTH, mode=Mode.SUBTRACT)


solid = part.part
